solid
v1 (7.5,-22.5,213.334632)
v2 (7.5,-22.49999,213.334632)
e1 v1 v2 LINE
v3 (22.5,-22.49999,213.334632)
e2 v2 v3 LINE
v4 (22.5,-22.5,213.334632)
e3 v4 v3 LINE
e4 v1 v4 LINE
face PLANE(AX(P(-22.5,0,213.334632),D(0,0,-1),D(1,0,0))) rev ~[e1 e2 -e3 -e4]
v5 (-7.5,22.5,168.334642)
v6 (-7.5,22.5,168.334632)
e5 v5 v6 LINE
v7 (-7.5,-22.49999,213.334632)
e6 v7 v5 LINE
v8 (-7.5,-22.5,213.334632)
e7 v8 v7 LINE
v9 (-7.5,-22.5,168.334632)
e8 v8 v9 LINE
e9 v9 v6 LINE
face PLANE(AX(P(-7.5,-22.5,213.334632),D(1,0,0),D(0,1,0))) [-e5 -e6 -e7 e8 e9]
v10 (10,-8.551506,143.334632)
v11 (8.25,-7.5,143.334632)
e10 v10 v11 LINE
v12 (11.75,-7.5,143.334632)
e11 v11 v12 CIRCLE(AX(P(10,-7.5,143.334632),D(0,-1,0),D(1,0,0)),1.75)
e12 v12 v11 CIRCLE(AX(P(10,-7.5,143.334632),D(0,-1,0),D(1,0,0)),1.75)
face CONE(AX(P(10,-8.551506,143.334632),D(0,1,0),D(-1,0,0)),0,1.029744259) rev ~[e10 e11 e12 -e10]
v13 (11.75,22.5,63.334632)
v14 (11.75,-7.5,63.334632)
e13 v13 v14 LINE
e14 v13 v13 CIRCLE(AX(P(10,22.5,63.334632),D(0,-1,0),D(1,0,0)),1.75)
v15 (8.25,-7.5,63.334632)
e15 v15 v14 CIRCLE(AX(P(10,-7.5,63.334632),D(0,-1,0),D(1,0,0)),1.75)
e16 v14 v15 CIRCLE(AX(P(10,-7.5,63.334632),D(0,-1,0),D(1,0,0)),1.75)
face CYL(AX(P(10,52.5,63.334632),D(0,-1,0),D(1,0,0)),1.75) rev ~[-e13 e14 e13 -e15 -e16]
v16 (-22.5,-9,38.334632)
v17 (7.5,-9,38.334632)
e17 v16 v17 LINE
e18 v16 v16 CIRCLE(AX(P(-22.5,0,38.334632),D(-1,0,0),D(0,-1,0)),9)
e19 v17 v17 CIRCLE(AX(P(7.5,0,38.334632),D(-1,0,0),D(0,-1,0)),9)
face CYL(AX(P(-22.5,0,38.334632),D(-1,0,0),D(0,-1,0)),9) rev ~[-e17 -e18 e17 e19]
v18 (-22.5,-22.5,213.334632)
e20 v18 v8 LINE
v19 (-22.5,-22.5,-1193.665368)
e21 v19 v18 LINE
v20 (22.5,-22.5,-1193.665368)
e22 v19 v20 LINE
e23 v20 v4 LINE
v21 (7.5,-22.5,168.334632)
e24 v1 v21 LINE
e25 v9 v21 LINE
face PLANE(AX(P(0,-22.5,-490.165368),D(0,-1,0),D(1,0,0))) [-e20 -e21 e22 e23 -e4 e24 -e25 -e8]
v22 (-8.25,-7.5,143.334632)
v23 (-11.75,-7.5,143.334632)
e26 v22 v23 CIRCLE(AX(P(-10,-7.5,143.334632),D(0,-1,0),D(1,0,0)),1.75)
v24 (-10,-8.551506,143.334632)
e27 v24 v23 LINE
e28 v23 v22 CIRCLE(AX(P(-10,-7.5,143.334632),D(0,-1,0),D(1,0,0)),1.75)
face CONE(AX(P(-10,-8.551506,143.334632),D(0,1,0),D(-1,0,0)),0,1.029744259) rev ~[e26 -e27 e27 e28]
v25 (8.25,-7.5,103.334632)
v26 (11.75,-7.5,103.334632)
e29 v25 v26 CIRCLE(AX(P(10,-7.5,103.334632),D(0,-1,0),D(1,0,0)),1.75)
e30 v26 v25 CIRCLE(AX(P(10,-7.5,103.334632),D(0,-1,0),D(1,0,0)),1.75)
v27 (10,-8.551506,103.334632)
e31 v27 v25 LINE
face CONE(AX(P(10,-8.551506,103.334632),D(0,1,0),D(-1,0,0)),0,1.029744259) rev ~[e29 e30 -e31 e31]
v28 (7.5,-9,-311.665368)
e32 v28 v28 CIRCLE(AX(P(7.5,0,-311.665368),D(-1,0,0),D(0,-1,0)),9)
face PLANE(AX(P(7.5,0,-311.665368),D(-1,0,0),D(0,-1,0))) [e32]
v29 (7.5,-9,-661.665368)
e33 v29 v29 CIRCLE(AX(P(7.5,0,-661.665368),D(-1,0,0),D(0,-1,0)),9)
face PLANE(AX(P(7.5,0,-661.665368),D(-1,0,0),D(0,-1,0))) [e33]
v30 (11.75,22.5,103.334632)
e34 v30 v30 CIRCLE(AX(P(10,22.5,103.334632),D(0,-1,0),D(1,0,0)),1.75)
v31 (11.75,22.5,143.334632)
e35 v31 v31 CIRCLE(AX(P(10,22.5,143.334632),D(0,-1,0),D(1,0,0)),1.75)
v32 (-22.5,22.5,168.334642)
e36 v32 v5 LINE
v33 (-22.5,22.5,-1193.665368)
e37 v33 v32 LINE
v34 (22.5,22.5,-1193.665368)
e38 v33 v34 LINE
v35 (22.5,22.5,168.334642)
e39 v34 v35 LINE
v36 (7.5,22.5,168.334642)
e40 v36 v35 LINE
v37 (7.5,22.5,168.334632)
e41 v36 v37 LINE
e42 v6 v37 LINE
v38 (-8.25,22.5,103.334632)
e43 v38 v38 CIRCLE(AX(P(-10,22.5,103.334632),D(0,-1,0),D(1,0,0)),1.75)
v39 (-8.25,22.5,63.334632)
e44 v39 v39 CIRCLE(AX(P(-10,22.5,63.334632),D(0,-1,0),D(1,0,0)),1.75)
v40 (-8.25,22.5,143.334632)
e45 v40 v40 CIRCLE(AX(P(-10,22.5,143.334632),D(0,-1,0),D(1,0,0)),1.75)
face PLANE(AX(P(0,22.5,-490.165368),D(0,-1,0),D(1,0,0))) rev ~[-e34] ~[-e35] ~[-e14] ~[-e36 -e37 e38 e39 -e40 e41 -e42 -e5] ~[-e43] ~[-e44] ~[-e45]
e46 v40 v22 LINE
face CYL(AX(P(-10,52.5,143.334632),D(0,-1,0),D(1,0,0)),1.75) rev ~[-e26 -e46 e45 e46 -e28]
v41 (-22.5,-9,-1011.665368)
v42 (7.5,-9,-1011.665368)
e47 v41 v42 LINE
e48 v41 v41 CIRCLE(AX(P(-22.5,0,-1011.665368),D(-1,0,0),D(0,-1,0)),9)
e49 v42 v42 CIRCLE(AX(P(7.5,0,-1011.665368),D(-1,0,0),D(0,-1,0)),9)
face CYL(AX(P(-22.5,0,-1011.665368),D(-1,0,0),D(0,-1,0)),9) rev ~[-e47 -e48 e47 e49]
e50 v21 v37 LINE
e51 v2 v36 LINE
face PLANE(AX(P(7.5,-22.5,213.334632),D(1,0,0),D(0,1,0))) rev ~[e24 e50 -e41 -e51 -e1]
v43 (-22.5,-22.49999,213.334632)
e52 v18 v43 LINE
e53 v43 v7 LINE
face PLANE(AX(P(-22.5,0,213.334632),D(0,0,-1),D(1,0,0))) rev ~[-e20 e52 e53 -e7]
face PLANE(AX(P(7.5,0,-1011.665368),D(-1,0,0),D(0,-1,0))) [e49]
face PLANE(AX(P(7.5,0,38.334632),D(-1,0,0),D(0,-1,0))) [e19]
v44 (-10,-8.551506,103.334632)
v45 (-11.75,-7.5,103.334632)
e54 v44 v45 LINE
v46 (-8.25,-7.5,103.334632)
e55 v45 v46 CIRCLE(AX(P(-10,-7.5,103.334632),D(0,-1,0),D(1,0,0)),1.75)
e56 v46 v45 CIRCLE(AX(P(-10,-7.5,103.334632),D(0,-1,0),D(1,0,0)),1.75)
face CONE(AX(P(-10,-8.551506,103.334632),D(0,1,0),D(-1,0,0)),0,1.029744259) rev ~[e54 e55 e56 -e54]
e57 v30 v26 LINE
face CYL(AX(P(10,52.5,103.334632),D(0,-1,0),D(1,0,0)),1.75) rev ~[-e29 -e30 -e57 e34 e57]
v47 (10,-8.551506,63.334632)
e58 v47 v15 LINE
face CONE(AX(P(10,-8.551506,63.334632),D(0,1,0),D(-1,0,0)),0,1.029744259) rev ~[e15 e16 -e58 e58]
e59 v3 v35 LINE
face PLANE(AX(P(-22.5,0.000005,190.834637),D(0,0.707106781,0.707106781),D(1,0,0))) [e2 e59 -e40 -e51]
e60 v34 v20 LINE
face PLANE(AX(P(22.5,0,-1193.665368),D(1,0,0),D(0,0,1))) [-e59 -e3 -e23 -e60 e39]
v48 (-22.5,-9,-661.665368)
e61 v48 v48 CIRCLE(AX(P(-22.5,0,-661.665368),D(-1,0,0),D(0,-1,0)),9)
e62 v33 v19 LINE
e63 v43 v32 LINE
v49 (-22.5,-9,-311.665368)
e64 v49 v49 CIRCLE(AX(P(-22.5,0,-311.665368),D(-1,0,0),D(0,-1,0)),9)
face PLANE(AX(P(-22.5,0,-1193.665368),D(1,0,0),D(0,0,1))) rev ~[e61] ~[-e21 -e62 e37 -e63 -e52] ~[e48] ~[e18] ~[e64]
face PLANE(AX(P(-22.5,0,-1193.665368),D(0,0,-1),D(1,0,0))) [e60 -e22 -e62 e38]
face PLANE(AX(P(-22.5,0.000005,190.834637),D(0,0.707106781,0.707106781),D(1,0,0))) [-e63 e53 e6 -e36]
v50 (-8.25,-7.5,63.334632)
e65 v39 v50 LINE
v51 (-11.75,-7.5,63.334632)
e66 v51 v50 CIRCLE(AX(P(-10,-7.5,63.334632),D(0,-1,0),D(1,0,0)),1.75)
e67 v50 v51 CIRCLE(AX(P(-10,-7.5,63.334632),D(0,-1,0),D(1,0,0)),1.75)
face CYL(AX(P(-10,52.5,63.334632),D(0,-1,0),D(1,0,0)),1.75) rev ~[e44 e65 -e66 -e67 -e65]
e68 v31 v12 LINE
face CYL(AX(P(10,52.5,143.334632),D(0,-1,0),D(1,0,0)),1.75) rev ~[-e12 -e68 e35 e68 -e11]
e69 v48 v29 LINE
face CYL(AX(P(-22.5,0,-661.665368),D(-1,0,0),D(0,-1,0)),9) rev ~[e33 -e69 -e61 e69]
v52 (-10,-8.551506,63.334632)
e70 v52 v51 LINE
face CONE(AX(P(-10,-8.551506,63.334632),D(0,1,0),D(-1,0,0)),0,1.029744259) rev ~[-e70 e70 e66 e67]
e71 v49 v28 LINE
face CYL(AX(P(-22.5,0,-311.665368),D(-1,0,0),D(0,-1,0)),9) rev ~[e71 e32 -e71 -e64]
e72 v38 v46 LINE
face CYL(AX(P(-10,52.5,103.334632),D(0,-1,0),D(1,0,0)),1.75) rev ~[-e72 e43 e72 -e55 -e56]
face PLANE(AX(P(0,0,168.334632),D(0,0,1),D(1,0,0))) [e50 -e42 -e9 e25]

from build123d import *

# Parameters (mm, degrees)
F0_W     = 45
F0_H     = 1407
F1_DEPTH = 22.5
F3_SIZE2 = 44.99999
F3_SIZE  = 44.99999
F2_W     = 15
F2_H     = 45
F4_DEPTH = 45
F5_R     = 9
F6_DEPTH = 30
F9_D     = 3.5
F9_DEPTH = 30
F9_TIP   = 1.0515060833


# Not quite as in the source:
# - a fillet or chamfer is up to 0.001 mm smaller than in the source, because OpenCascade refuses the exact size


with BuildPart() as f1:
    # F0 (on Front) → F1 (new body, symmetric)
    with BuildSketch(Plane.XZ):
        with Locations((0, -490.1653682211)):
            Rectangle(F0_W, F0_H)
    extrude(amount=F1_DEPTH, both=True)

    # F3 (size 45 and 45 in the source; OpenCascade refuses exactly that, so slightly less here)
    f3_edges = [f1.edges().sort_by_distance(p)[0] for p in [
        (0, 22.5, 213.334632),
    ]]
    chamfer(f3_edges, length=F3_SIZE, length2=F3_SIZE2)

    # F2 (on face) → F4 (cut)
    with BuildSketch(Plane.XY.offset(213.3346317789)):
        Rectangle(F2_W, F2_H)
    extrude(amount=-F4_DEPTH, mode=Mode.SUBTRACT)

    # F5 (on face) → F6 (cut)
    with BuildSketch(Plane(origin=(-22.5, 0, 0), x_dir=(0, -1, 0), z_dir=(-1, 0, 0))):
        with Locations((0, 38.3346317789)):
            Circle(F5_R)
        with Locations((0, -311.6653682211)):
            Circle(F5_R)
        with Locations((0, -661.6653682211)):
            Circle(F5_R)
        with Locations((0, -1011.6653682211)):
            Circle(F5_R)
    extrude(amount=-F6_DEPTH, mode=Mode.SUBTRACT)

    # F9
    with Locations(Plane(origin=(0, 22.5, 0), x_dir=(-1, 0, 0), z_dir=(0, 1, 0))):
        with Locations((-10, 103.3346317789), (-10, 63.3346317789), (10, 63.3346317789), (10, 103.3346317789), (10, 143.3346317789), (-10, 143.3346317789)):
            Hole(F9_D / 2, depth=F9_DEPTH)
            with Locations((0, 0, -(F9_DEPTH + F9_TIP / 2))):  # 118° drill point
                Cone(0, F9_D / 2, F9_TIP, mode=Mode.SUBTRACT)


solid = f1.part
